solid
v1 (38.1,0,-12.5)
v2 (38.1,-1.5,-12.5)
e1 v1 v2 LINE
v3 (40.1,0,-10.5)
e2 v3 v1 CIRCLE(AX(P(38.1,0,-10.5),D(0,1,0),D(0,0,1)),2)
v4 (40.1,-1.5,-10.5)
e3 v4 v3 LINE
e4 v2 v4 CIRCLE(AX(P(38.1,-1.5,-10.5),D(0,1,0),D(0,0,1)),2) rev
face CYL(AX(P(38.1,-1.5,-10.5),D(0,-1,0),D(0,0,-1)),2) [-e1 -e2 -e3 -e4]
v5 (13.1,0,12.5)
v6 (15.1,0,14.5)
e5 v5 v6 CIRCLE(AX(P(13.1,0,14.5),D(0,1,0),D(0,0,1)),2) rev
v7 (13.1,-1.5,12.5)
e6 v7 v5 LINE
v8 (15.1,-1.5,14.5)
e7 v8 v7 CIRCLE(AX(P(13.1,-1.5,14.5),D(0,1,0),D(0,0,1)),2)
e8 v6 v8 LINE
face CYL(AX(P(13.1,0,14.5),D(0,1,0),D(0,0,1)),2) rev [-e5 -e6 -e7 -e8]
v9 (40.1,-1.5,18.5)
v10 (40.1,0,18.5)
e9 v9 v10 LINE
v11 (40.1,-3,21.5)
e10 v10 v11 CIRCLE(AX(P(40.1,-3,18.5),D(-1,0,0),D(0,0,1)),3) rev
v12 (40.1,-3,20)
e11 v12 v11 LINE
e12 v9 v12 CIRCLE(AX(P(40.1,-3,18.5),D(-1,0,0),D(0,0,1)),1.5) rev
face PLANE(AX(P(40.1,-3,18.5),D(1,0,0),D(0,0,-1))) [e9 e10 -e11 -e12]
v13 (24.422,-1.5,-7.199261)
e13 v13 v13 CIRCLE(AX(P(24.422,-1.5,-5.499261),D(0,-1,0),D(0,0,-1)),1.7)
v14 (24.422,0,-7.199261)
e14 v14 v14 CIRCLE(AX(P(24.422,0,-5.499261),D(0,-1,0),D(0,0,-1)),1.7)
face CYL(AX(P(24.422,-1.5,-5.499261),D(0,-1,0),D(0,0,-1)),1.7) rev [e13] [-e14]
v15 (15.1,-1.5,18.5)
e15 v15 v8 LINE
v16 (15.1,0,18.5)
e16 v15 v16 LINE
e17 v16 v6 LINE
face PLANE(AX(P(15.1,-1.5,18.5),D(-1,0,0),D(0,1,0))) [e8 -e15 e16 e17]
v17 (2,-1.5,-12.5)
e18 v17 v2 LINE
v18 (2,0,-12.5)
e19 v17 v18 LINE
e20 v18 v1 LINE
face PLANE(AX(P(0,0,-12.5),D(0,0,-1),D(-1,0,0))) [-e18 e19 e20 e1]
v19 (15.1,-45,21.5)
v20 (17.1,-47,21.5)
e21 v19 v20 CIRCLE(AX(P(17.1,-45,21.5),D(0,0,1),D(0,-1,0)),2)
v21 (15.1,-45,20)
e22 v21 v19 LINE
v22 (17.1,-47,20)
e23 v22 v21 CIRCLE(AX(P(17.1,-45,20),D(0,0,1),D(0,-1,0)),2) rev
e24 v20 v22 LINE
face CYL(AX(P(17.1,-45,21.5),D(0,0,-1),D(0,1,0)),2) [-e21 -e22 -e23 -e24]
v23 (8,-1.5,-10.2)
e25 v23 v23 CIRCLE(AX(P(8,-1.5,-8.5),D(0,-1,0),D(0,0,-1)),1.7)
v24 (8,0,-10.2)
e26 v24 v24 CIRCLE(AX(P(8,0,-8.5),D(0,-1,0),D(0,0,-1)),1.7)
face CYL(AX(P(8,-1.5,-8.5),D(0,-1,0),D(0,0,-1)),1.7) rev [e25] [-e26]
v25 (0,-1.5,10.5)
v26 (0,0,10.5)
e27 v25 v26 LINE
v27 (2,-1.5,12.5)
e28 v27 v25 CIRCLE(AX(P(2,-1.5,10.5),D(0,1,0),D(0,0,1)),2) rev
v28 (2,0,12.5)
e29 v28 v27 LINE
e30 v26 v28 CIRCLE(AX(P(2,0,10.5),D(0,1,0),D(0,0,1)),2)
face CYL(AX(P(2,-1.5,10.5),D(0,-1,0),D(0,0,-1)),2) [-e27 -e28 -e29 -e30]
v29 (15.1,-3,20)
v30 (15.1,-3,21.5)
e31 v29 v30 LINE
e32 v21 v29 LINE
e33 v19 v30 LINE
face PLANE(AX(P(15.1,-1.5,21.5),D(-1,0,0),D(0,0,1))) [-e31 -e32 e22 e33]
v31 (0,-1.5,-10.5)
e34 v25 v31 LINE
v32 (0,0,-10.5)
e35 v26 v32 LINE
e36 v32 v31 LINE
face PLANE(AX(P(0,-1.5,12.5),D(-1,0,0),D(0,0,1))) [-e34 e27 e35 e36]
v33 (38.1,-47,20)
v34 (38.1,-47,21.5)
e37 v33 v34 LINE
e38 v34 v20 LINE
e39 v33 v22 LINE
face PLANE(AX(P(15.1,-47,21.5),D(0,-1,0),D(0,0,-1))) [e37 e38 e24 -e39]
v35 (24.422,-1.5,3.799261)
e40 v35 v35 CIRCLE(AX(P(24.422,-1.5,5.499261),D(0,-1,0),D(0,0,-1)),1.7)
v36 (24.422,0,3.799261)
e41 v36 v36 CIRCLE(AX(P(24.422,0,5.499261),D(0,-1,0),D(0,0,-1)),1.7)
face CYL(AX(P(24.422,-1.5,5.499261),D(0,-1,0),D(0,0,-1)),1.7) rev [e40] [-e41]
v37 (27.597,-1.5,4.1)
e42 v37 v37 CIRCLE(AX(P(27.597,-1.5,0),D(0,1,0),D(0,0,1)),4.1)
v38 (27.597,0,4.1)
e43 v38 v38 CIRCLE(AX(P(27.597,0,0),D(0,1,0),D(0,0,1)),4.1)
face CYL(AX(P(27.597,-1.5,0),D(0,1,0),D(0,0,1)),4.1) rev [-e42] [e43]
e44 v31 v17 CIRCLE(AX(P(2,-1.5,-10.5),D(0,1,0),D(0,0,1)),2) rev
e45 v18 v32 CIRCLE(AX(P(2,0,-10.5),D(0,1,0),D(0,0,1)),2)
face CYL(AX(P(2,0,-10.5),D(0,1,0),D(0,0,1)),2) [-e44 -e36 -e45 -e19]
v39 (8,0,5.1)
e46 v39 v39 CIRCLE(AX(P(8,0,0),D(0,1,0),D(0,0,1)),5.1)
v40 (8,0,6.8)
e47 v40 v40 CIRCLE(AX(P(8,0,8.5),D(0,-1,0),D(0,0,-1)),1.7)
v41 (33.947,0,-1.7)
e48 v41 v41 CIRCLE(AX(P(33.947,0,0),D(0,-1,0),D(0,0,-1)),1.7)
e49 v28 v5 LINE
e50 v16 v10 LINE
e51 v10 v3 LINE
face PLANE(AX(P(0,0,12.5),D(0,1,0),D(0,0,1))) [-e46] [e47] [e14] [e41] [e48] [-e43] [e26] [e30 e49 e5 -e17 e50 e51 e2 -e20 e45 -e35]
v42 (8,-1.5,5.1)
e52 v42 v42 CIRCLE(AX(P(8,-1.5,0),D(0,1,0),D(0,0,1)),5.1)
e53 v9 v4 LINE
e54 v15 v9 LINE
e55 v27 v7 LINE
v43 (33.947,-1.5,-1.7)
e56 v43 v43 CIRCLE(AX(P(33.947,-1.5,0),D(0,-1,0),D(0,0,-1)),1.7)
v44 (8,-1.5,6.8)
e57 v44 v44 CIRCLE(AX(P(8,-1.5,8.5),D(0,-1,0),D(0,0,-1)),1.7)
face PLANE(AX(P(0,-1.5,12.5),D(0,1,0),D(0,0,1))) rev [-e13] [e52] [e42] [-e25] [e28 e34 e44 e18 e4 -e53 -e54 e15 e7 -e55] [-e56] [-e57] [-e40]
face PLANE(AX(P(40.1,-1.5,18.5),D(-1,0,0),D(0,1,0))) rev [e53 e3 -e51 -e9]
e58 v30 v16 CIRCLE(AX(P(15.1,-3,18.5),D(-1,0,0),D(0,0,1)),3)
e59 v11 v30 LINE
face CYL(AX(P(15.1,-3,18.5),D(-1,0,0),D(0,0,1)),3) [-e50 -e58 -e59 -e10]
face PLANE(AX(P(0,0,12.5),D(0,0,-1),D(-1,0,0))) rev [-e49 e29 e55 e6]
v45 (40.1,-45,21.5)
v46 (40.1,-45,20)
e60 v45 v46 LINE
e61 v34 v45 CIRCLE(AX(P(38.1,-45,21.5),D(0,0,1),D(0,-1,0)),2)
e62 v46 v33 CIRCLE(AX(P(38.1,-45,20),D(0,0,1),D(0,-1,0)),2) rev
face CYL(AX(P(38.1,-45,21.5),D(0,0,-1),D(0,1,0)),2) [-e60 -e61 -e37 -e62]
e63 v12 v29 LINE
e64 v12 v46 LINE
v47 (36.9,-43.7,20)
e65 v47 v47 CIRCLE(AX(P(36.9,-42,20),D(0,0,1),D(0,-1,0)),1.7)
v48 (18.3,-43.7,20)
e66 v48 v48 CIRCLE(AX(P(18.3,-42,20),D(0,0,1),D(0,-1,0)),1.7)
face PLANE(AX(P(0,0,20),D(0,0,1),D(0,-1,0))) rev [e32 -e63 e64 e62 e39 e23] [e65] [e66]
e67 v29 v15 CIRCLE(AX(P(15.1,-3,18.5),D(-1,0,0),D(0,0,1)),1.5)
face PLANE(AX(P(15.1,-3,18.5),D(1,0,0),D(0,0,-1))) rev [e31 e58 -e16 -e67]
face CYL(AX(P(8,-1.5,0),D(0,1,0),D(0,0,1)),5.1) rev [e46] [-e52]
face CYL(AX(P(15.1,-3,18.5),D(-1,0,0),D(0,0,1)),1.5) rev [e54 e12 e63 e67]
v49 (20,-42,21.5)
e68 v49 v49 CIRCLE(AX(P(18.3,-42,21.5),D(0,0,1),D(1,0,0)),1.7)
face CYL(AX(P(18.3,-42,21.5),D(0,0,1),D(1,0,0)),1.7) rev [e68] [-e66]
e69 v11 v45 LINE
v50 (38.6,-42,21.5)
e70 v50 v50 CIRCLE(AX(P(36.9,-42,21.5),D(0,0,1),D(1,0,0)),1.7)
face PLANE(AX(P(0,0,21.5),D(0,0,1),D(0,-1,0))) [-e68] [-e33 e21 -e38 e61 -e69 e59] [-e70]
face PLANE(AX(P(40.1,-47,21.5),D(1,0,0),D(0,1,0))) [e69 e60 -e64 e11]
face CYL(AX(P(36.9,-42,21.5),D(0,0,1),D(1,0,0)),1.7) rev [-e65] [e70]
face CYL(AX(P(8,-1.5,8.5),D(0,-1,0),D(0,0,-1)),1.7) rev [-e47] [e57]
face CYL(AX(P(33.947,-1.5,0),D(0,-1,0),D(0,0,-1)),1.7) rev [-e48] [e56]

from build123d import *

# Parameters (mm, degrees)
SKETCH1_W            = 41.6
SKETCH1_H            = 1.5
BASE_FLANGE1_DEPTH   = 12.5
M3_CLEARANCE_HOLE2_D = 3.4
M3_CLEARANCE_HOLE3_D = 3.4
SKETCH12_R           = 5.1
SKETCH12_R_2         = 4.1
CUT_EXTRUDE1_DEPTH   = 1.5
EDGE_FLANGE1_DEPTH   = 25
SKETCH22_W           = 1.5
SKETCH22_H           = 25
CUT_EXTRUDE2_DEPTH   = 1.5
FILLET1_R            = 2
M3_CLEARANCE_HOLE4_D = 3.4


# Sheet-metal steps are written as plain solids
with BuildPart() as part:
    # Sketch1 → Base-Flange1 (new, symmetric)
    with BuildSketch(Plane.XY):
        with Locations((20.8, -0.75)):
            Rectangle(SKETCH1_W, SKETCH1_H)
    extrude(amount=BASE_FLANGE1_DEPTH, both=True)

    # M3 Clearance Hole2 (through all)
    with Locations(Plane(origin=(0, -1.5, 0), x_dir=(-1, 0, 0), z_dir=(0, -1, 0))):
        with Locations((-8, -8.5), (-8, 8.5)):
            Hole(M3_CLEARANCE_HOLE2_D / 2)

    # M3 Clearance Hole3 (through all)
    with Locations(Plane(origin=(0, -1.5, 0), x_dir=(-1, 0, 0), z_dir=(0, -1, 0))):
        with Locations((-24.422, -5.499261314), (-33.947, 0), (-24.422, 5.499261314)):
            Hole(M3_CLEARANCE_HOLE3_D / 2)

    # Sketch12 → Cut-Extrude1 (cut)
    with BuildSketch(Plane(origin=(0, 0, 0), x_dir=(1, 0, 0), z_dir=(0, 1, 0))):
        with Locations(Location((8, 0, 0), (0, 0, 270))):
            Circle(SKETCH12_R)
        with Locations(Location((27.597, 0, 0), (0, 0, 270))):
            Circle(SKETCH12_R_2)
    extrude(amount=-CUT_EXTRUDE1_DEPTH, mode=Mode.SUBTRACT)

    # Edge-Flange1 section (across the edge) → Edge-Flange1 (add)
    with BuildSketch(Plane(origin=(40.1, -1.5, 20), x_dir=(0, 0, -1), z_dir=(-1, 0, 0))):
        with BuildLine():
            Line((-1.5, 1.5), (-1.5, 45.5))
            Line((-1.5, 45.5), (0, 45.5))
            Line((0, 45.5), (0, 1.5))
            ThreePointArc((0, 1.5), (0.439339828, 0.439339828), (1.5, 0))
            Line((1.5, 0), (7.5, 0))
            Line((7.5, 0), (7.5, -1.5))
            Line((7.5, -1.5), (1.5, -1.5))
            ThreePointArc((1.5, -1.5), (-0.621320344, -0.621320344), (-1.5, 1.5))
        make_face()
    extrude(amount=EDGE_FLANGE1_DEPTH)

    # Sketch22 → Cut-Extrude2 (cut)
    with BuildSketch(Plane(origin=(0, 0, 0), x_dir=(1, 0, 0), z_dir=(0, 1, 0))):
        with Locations((40.85, 0)):
            Rectangle(SKETCH22_W, SKETCH22_H)
    extrude(amount=-CUT_EXTRUDE2_DEPTH, mode=Mode.SUBTRACT)

    # Fillet1
    fillet1_edges = [part.edges().sort_by_distance(p)[0] for p in [
        (0, -0.75, 12.5),
        (0, -0.75, -12.5),
        (15.1, -0.75, 12.5),
        (40.1, -47, 20.75),
        (15.1, -47, 20.75),
        (40.1, -0.75, -12.5),
    ]]
    fillet(fillet1_edges, radius=FILLET1_R)

    # M3 Clearance Hole4 (through all)
    with Locations(Plane.XY.offset(21.5)):
        with Locations((36.9, -42), (18.3, -42)):
            Hole(M3_CLEARANCE_HOLE4_D / 2)


solid = part.part
